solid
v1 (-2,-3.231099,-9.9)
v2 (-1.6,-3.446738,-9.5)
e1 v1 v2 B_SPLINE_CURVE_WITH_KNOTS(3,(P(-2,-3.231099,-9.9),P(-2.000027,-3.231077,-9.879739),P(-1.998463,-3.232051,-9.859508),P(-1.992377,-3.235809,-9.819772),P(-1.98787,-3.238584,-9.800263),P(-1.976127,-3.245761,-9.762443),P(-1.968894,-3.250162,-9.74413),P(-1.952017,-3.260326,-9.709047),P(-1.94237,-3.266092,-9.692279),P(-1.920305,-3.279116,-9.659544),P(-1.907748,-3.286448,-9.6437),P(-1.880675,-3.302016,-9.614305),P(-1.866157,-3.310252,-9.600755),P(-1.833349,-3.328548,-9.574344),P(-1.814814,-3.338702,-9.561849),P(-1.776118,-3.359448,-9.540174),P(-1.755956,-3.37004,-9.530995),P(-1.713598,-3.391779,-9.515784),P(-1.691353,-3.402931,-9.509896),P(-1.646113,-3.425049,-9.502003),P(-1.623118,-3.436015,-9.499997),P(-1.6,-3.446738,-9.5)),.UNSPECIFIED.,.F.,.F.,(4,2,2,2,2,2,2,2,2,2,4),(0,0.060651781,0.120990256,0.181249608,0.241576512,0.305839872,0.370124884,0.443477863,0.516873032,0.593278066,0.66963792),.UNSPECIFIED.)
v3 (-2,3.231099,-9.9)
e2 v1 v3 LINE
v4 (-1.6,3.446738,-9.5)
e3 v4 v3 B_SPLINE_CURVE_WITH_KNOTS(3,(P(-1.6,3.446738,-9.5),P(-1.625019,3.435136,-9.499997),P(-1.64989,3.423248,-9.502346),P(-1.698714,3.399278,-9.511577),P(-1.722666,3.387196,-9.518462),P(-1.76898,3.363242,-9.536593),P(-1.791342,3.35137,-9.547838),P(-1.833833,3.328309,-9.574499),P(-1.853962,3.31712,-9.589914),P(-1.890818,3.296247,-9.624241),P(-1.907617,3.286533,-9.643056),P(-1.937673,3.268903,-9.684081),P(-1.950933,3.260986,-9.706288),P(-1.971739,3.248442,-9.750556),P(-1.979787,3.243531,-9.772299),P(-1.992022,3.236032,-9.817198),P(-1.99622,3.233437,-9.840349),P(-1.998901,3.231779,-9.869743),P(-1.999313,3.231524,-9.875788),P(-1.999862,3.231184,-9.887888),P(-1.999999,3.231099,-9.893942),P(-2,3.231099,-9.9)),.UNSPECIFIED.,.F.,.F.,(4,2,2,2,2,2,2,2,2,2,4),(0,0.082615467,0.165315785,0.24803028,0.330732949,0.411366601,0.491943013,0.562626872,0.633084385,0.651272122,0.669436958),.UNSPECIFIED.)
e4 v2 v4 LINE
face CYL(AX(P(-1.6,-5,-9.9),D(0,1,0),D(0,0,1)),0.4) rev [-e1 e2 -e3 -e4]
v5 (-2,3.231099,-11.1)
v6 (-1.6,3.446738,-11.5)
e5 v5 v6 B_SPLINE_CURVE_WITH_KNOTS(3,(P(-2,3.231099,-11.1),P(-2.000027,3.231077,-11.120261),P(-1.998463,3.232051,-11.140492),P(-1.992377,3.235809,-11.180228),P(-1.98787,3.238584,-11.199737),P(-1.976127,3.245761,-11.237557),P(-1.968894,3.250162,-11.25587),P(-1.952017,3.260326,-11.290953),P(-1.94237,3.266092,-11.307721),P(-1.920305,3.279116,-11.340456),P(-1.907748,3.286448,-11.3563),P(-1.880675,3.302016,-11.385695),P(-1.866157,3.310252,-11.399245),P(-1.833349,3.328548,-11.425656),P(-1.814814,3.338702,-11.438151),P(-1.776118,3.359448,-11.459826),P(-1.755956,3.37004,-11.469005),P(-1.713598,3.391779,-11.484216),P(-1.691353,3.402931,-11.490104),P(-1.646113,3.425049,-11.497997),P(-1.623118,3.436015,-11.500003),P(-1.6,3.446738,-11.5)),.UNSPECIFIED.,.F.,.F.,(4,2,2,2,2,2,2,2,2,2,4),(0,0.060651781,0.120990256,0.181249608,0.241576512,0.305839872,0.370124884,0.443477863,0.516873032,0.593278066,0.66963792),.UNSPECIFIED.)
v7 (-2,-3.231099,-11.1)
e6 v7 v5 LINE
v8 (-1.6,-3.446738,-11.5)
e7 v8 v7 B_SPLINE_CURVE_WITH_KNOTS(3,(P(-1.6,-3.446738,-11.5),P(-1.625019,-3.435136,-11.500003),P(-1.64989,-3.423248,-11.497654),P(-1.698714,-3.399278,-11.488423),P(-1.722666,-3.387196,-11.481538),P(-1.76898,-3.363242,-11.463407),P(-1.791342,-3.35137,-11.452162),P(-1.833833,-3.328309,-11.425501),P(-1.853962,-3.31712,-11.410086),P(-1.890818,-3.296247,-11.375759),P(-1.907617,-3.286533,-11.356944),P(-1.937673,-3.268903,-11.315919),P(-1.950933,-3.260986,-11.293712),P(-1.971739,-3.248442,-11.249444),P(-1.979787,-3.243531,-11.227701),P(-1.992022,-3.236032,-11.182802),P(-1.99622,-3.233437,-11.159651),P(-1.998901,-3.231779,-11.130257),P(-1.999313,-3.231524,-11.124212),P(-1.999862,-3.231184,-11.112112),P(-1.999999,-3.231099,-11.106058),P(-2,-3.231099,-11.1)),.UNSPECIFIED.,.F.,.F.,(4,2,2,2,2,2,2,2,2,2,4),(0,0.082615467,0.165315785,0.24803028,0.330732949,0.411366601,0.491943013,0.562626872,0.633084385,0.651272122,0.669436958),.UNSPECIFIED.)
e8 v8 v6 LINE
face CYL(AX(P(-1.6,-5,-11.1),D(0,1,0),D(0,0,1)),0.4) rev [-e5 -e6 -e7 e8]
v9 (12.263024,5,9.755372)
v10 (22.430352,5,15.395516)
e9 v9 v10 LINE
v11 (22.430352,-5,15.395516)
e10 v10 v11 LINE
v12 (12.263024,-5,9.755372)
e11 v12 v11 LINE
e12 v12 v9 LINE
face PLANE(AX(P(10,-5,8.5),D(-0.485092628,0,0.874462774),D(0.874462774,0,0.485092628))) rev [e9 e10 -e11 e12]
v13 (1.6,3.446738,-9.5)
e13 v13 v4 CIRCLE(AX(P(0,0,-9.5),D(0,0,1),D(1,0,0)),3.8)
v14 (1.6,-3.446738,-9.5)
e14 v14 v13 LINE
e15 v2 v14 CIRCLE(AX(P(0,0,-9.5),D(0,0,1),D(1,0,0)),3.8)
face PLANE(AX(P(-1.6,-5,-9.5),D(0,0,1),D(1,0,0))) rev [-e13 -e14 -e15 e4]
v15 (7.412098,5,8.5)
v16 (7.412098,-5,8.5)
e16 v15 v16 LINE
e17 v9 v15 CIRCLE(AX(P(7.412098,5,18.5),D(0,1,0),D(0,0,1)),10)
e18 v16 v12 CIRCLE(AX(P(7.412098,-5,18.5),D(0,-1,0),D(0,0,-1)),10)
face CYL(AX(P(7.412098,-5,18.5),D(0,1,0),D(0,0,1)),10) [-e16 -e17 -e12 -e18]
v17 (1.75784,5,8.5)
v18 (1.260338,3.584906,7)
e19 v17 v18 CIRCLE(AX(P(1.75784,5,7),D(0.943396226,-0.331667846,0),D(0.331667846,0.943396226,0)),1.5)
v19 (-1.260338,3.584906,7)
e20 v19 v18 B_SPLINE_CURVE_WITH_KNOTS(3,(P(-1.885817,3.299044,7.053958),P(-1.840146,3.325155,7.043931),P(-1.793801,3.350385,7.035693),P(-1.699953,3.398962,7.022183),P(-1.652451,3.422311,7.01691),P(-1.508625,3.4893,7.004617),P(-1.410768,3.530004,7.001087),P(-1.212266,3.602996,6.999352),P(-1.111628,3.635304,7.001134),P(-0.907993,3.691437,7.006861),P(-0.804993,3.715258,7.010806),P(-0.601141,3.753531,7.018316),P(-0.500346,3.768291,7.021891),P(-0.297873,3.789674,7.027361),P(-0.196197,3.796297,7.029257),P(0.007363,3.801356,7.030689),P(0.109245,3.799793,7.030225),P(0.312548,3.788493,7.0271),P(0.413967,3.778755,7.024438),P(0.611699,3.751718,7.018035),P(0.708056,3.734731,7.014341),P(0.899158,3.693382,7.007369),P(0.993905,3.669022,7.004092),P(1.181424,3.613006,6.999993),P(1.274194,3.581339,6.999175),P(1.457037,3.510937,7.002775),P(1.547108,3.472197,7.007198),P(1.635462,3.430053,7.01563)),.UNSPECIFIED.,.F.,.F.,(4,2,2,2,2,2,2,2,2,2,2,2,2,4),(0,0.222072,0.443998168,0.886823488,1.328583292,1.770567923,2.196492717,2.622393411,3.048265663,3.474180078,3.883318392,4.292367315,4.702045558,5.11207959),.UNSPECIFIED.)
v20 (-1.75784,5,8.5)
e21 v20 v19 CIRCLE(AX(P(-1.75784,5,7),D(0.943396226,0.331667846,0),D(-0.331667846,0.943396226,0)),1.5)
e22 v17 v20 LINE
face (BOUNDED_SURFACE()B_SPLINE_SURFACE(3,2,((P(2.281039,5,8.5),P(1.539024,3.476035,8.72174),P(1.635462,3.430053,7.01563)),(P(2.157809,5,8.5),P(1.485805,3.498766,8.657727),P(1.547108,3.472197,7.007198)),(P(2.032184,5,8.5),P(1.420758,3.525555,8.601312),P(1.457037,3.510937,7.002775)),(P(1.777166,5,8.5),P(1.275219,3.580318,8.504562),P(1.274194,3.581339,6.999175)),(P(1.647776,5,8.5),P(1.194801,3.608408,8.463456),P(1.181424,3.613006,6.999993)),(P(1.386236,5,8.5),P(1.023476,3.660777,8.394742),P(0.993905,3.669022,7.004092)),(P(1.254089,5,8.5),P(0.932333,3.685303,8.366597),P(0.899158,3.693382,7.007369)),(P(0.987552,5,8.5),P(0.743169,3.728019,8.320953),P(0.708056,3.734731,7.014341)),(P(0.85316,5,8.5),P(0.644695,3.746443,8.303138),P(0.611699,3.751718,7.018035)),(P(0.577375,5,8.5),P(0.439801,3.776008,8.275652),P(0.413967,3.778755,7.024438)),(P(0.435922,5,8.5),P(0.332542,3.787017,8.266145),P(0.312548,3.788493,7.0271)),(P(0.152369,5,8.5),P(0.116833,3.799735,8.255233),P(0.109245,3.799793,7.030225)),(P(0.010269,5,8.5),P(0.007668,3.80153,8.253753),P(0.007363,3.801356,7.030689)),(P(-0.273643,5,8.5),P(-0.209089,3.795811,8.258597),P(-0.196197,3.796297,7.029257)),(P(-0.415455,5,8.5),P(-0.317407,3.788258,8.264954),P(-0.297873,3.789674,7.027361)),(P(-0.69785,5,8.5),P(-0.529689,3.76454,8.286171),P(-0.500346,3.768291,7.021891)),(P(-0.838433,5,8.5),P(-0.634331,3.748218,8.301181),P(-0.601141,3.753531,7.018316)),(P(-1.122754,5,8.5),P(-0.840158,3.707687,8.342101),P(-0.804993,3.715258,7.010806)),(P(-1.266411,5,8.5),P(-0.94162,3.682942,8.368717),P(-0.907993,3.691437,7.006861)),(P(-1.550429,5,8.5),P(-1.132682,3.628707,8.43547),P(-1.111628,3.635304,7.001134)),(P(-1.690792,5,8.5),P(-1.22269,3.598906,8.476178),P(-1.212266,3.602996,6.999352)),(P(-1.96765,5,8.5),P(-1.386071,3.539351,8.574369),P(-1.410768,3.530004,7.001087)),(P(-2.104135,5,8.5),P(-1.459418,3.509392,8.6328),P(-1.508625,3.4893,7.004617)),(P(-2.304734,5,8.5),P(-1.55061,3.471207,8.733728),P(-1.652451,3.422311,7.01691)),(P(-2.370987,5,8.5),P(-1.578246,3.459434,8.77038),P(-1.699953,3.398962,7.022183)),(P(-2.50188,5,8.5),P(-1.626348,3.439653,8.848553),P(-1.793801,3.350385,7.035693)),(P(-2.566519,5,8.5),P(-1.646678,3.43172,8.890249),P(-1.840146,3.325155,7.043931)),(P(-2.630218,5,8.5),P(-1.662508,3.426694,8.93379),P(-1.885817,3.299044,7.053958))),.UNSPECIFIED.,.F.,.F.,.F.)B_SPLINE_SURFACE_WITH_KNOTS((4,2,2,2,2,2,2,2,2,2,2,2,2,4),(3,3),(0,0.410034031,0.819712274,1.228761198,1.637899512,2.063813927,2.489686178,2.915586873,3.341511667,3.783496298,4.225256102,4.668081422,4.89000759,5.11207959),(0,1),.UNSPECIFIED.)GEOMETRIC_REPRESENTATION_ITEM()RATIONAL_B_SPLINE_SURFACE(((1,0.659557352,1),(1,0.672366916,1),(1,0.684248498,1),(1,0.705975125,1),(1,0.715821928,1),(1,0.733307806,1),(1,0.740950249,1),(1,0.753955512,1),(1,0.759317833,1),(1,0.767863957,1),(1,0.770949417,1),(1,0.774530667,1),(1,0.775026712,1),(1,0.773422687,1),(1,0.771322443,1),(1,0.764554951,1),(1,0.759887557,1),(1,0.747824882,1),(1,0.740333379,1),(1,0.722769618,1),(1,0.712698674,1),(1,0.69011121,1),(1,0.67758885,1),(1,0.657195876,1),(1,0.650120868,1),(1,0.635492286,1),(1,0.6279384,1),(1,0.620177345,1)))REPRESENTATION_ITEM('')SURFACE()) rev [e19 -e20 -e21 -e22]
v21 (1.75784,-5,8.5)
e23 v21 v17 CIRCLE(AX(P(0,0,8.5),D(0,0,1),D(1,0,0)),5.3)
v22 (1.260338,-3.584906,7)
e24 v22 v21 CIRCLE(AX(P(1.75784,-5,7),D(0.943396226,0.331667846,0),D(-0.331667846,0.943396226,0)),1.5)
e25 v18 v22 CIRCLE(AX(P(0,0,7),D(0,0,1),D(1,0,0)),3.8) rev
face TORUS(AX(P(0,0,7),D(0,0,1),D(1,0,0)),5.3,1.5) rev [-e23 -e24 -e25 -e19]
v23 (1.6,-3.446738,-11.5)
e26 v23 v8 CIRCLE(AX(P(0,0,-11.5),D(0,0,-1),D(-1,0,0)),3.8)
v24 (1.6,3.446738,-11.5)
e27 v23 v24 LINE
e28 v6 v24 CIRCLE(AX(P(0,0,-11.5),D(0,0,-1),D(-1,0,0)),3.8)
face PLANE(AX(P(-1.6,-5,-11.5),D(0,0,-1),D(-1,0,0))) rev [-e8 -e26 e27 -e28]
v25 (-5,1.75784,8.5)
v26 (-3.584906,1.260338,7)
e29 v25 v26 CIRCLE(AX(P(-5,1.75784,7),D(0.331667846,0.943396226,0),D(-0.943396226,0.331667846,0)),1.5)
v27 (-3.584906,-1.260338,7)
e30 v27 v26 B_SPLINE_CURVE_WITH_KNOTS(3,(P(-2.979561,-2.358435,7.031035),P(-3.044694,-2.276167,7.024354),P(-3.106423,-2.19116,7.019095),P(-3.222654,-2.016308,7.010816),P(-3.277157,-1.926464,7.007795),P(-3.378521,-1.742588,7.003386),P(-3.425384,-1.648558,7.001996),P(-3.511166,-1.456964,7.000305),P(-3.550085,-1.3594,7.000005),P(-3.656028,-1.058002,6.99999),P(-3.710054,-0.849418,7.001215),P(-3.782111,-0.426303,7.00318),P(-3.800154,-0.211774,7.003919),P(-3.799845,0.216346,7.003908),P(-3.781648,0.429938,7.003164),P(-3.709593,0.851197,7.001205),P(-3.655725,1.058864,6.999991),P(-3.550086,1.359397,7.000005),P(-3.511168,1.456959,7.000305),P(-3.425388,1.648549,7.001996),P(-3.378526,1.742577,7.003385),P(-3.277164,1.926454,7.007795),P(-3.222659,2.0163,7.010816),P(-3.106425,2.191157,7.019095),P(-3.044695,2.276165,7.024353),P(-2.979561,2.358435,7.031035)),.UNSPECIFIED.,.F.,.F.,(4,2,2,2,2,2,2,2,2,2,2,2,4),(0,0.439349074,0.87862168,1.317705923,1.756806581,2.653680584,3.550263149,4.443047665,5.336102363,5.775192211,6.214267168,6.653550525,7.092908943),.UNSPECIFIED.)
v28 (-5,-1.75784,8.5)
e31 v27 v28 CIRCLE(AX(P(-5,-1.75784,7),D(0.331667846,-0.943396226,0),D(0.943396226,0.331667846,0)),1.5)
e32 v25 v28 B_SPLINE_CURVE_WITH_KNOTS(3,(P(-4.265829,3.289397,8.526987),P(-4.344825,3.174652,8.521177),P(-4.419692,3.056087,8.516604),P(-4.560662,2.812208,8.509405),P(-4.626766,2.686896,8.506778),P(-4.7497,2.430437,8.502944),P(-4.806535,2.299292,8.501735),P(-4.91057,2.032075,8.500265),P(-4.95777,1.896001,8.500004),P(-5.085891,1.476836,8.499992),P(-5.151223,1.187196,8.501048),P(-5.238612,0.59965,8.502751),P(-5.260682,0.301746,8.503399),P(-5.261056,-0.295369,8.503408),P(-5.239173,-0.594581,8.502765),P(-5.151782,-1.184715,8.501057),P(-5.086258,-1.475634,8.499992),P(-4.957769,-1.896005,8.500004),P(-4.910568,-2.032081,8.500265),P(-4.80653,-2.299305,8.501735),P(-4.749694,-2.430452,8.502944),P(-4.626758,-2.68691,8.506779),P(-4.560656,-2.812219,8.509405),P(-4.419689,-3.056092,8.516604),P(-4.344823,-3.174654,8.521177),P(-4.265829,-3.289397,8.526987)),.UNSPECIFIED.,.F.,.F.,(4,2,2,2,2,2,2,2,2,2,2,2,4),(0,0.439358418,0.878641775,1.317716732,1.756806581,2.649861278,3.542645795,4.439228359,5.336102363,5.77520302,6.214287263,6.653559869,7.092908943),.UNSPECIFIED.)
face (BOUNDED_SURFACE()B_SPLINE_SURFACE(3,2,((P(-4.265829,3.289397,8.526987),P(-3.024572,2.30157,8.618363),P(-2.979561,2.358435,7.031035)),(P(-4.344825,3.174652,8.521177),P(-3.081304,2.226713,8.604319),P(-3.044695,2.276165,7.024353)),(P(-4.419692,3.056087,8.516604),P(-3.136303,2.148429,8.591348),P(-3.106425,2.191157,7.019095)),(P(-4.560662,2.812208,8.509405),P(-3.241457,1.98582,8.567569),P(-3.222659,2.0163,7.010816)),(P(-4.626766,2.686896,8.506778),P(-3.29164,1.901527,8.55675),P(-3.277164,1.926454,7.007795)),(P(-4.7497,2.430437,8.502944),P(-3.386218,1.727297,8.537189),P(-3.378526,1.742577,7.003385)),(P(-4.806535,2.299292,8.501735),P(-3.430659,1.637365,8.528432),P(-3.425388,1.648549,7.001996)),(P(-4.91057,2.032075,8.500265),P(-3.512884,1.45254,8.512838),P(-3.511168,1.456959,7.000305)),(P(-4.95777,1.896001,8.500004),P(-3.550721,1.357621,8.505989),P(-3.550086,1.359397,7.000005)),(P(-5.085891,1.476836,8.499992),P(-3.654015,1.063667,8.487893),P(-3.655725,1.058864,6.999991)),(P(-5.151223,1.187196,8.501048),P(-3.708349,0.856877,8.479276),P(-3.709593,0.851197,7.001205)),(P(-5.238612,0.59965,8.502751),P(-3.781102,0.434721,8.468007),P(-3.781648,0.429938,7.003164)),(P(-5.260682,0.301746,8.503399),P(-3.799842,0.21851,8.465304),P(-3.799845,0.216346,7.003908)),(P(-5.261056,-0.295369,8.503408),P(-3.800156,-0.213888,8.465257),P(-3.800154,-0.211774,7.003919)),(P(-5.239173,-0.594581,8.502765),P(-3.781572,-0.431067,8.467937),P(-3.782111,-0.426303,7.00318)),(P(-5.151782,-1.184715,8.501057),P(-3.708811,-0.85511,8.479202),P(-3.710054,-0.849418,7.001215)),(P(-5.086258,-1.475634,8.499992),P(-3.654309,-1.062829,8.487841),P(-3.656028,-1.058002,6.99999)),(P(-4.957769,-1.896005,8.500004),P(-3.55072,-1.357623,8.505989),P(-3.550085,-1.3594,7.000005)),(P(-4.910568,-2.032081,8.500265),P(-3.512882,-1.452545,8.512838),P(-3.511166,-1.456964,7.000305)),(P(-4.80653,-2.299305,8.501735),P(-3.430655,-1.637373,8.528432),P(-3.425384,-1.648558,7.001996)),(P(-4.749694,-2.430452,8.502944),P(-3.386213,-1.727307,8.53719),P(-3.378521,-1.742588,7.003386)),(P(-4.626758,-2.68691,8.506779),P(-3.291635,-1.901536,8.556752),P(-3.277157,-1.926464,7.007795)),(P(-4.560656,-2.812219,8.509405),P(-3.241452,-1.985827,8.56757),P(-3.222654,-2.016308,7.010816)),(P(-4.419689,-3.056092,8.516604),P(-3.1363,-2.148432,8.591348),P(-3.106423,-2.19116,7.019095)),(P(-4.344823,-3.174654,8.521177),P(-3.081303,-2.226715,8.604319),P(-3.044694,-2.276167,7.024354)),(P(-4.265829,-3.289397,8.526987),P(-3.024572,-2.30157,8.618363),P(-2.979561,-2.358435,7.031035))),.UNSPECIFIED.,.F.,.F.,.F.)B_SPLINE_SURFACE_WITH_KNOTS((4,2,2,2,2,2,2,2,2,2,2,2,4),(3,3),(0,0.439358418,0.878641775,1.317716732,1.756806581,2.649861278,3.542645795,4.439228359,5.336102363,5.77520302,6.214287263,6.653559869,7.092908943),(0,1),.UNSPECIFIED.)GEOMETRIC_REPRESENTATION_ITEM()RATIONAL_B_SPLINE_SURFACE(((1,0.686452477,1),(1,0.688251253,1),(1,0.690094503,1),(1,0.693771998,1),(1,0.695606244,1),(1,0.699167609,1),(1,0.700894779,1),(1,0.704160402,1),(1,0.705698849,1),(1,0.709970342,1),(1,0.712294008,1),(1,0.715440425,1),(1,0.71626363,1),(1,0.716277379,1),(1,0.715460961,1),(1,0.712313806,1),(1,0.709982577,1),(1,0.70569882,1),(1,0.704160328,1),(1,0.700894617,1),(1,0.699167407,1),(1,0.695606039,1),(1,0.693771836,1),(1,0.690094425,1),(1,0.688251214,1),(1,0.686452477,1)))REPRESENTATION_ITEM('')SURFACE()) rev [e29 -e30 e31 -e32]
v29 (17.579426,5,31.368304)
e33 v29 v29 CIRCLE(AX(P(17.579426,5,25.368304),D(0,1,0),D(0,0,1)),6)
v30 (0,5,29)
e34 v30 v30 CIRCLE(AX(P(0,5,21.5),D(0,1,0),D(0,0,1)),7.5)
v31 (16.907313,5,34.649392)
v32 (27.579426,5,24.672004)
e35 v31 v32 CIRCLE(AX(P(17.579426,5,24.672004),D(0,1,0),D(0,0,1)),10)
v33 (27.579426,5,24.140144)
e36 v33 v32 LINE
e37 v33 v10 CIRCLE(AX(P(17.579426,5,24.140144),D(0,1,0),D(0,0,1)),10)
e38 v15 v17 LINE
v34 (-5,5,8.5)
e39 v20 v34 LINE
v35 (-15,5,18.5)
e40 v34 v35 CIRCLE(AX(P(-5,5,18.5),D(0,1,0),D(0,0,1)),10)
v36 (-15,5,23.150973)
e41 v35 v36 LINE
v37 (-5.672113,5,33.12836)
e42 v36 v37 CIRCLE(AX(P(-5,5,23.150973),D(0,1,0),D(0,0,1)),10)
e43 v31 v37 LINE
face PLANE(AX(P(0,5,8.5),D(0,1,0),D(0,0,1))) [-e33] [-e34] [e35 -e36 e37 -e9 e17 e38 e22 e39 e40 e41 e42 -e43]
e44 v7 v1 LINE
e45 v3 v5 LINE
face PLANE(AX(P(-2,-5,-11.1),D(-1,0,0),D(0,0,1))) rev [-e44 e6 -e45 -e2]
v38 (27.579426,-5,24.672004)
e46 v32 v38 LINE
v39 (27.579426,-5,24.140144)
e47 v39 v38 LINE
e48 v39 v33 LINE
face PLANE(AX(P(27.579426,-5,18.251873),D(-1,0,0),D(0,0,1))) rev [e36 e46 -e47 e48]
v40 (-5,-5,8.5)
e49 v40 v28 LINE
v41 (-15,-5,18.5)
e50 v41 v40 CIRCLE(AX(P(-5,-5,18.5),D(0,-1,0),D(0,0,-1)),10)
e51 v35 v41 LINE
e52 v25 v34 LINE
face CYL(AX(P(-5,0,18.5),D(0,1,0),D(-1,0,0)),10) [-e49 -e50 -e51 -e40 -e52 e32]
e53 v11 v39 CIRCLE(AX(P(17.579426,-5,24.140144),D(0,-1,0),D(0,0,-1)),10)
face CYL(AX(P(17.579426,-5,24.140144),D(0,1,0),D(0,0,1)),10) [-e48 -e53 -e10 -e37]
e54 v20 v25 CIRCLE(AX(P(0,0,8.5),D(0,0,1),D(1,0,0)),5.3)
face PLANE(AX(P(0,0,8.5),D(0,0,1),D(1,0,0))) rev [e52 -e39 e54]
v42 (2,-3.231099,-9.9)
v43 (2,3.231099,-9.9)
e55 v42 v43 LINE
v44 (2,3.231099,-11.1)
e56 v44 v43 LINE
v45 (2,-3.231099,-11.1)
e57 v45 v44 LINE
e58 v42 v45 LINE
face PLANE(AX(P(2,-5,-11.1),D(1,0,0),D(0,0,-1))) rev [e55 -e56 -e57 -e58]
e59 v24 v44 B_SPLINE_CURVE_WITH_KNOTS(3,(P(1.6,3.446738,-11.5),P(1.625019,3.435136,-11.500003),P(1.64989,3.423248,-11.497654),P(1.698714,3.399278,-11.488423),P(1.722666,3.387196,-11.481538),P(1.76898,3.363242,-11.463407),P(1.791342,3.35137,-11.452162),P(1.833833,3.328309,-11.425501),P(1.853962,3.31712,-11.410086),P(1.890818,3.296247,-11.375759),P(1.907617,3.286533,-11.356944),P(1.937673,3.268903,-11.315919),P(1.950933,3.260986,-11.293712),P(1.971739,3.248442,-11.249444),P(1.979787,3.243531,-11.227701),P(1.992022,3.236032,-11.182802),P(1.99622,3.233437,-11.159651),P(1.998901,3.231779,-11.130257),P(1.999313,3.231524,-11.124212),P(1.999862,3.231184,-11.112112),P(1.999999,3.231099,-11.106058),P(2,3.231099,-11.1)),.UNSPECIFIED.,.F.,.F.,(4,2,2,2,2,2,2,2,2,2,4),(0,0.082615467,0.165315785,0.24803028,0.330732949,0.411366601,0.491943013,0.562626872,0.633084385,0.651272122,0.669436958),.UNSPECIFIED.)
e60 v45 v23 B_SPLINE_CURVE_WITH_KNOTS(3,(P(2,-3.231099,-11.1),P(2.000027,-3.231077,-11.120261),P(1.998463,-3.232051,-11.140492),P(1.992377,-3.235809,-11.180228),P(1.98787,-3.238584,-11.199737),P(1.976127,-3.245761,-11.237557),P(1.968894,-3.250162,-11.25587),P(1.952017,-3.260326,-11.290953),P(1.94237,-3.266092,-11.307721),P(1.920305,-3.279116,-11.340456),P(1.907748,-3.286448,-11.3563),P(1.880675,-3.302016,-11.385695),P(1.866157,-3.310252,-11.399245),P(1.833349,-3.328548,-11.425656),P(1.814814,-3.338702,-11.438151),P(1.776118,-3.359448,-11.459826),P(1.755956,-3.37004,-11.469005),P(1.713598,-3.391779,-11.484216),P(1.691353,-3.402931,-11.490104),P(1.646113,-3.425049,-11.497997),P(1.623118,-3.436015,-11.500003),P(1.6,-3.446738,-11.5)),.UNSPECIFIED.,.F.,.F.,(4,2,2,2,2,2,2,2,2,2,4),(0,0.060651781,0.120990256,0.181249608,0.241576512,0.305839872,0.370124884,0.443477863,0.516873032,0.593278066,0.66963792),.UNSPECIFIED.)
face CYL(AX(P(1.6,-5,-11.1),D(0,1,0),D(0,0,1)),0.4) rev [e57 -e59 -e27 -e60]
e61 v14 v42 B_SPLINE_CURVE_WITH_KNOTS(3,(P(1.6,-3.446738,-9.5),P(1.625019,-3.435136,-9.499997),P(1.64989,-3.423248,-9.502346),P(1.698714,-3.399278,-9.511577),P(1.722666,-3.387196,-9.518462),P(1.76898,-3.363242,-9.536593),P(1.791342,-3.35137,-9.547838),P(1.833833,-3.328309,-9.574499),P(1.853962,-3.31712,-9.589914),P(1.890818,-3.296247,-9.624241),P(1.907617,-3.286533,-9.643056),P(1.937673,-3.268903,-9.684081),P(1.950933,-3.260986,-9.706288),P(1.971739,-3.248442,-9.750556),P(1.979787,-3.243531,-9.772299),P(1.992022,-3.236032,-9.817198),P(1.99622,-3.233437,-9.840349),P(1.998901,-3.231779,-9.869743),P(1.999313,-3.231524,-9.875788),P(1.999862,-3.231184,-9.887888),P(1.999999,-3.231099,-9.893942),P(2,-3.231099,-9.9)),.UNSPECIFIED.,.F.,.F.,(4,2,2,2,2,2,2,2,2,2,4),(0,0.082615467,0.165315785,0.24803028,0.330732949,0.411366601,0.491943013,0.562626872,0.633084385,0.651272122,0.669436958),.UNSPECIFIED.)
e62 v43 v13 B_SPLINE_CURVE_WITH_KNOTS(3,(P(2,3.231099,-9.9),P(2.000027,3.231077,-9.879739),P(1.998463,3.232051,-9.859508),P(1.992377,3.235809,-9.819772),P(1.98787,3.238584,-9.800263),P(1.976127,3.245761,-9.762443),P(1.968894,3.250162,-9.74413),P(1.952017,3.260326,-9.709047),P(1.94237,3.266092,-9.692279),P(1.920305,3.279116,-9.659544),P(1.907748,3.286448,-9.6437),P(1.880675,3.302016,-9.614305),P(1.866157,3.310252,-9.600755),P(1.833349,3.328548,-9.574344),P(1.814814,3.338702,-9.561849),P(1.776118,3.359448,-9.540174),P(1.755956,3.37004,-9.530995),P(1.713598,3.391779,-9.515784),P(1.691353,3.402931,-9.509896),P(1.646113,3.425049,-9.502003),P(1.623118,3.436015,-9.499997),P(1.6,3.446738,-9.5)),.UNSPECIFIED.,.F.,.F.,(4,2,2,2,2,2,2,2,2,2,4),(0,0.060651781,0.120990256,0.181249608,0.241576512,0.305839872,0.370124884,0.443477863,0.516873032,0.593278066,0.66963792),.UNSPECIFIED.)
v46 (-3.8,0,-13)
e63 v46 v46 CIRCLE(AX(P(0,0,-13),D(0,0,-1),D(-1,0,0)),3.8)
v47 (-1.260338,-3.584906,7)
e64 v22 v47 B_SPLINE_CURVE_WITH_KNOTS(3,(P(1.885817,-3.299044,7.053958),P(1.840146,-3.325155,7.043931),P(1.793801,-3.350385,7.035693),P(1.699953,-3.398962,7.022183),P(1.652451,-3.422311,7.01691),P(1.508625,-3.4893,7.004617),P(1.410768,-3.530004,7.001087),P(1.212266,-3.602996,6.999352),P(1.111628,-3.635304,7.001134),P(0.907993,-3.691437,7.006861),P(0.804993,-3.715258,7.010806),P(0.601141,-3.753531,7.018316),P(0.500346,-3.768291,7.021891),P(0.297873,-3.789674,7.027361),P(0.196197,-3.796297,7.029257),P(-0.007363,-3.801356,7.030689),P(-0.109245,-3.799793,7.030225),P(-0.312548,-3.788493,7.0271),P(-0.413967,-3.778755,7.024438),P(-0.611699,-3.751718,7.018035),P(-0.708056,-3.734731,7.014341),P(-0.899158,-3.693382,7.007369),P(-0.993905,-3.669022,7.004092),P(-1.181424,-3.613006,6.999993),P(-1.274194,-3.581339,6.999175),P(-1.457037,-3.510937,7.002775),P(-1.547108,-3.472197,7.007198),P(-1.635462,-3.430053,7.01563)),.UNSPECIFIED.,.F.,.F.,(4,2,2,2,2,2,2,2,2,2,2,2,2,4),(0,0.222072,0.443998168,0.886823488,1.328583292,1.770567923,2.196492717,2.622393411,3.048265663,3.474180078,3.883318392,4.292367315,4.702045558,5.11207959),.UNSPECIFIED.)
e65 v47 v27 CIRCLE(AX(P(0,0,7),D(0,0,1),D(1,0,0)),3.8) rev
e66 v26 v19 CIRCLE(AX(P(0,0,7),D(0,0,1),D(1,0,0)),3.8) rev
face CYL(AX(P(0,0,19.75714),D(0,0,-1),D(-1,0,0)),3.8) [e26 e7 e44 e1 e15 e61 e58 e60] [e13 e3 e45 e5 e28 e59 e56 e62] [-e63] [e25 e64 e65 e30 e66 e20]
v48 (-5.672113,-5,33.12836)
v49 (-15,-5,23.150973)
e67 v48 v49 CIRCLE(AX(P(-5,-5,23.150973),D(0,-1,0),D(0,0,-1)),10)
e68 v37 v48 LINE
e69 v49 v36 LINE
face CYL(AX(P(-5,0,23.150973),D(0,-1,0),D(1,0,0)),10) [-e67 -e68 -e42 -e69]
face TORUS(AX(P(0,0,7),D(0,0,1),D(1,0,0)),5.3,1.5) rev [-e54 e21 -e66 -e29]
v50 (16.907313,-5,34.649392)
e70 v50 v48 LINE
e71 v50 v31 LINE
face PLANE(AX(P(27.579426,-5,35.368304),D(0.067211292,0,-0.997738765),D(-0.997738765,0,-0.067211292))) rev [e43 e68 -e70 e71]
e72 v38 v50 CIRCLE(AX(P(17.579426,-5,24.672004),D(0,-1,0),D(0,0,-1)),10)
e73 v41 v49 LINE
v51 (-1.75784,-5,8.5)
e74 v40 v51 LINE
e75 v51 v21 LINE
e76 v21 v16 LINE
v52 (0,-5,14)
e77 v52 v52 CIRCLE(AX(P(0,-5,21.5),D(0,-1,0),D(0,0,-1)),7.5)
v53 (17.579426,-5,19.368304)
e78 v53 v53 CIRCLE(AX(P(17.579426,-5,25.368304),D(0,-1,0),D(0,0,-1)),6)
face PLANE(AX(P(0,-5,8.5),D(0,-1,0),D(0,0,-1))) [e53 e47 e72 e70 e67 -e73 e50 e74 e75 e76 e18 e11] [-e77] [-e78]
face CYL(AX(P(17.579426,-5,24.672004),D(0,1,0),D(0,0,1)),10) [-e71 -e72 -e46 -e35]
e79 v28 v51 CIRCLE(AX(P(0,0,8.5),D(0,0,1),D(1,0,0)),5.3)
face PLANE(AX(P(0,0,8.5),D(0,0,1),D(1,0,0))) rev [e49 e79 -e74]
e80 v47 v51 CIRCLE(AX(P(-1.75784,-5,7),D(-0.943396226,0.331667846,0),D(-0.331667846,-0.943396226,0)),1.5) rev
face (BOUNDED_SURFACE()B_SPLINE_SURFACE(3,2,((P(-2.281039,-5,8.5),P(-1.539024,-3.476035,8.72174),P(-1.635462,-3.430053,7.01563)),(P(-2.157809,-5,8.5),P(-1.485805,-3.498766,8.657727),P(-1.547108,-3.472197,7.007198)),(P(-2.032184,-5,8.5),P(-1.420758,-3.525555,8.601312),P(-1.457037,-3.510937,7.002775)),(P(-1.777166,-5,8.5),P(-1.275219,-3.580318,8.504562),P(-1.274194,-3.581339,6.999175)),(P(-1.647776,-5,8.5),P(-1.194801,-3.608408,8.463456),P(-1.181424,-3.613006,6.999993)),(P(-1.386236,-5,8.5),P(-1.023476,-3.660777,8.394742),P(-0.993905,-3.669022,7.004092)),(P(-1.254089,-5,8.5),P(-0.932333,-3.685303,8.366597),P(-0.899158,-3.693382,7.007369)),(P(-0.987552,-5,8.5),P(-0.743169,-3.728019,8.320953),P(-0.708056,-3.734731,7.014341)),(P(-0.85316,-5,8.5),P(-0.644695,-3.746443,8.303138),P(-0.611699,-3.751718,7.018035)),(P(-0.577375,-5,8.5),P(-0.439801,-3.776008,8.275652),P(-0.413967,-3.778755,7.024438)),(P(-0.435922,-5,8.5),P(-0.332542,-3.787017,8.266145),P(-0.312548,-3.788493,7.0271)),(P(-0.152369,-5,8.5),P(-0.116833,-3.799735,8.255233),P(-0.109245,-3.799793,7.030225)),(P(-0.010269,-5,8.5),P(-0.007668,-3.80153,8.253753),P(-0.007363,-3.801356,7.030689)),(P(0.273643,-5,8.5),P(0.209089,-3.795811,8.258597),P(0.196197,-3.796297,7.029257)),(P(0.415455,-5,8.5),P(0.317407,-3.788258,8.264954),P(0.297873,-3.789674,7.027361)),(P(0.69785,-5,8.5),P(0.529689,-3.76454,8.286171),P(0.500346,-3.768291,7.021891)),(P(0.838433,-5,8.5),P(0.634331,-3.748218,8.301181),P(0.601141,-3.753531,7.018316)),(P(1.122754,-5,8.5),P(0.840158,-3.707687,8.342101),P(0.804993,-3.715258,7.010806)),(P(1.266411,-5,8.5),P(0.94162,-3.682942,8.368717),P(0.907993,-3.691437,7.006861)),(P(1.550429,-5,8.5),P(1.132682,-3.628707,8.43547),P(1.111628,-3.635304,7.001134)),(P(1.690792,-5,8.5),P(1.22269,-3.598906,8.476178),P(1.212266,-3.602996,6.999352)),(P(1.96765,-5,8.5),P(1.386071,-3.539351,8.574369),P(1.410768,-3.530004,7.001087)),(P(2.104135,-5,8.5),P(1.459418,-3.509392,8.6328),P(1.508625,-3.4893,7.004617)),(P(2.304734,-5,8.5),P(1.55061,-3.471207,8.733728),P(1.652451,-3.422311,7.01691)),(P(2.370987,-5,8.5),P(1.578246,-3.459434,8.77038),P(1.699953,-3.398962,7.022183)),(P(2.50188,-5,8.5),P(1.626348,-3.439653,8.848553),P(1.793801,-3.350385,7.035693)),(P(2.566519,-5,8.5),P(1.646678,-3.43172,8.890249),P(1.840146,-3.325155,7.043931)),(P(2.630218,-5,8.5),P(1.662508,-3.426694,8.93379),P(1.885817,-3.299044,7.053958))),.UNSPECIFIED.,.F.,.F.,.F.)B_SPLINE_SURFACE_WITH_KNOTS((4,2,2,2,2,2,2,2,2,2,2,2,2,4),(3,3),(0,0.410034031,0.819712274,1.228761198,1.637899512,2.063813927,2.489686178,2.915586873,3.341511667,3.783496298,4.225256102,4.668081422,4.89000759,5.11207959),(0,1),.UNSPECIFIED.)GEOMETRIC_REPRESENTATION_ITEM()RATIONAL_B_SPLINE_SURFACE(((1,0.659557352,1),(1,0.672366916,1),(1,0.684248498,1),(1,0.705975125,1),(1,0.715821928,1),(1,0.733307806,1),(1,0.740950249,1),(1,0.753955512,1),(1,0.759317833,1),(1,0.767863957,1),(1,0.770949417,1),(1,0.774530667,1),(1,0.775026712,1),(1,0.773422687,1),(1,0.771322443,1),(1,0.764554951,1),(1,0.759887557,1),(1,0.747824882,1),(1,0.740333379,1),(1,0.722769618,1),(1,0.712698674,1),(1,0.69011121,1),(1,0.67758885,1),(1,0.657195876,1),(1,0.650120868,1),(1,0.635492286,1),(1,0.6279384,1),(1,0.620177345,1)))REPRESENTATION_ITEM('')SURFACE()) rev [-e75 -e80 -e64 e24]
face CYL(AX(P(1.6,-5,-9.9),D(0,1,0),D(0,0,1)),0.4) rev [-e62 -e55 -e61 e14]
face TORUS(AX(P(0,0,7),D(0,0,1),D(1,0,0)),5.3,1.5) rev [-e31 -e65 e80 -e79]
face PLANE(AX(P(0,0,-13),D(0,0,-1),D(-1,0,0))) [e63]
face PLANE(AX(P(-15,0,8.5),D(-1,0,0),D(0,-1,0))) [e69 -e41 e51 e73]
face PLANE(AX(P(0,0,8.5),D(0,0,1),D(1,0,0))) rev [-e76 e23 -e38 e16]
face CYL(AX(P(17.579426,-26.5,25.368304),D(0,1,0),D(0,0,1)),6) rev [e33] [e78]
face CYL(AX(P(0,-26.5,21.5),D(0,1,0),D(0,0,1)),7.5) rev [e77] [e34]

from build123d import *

# Parameters (mm, degrees)
SKETCH1_R           = 5
BOSS_EXTRUDE1_DEPTH = 20
SKETCH2_R           = 5
SKETCH2_R_2         = 3.98
CUT_EXTRUDE2_DEPTH  = 8
SKETCH8_R           = 5
BOSS_EXTRUDE2_DEPTH = 20
BOSS_EXTRUDE3_START = -31.5
BOSS_EXTRUDE3_DEPTH = 31.5
BOSS_EXTRUDE4_START = -31.5
BOSS_EXTRUDE4_DEPTH = 31.5
SKETCH12_R          = 7.5
SKETCH12_R_2        = 6
CUT_EXTRUDE3_DEPTH  = 31.5
CUT_EXTRUDE4_DEPTH  = 55.083269132
FILLET1_R           = 10
BOSS_EXTRUDE5_START = 13
SKETCH17_R          = 3.98
BOSS_EXTRUDE5_DEPTH = 13
CUT_EXTRUDE5_DEPTH  = 46.417762115
SKETCH19_R          = 5
SKETCH19_R_2        = 3.98
CUT_EXTRUDE6_DEPTH  = 0.5
SKETCH20_R          = 3.98
SKETCH20_R_2        = 3.8
CUT_EXTRUDE7_DEPTH  = 21.5
FILLET2_R           = 1.5


with BuildPart() as part:
    # Sketch1 → Boss-Extrude1 (new body)
    with BuildSketch(Plane.XY):
        Circle(SKETCH1_R)
    extrude(amount=BOSS_EXTRUDE1_DEPTH)

    # Sketch2 → Cut-Extrude2 (cut)
    with BuildSketch(Plane(origin=(0, 0, 0), x_dir=(-1, 0, 0), z_dir=(0, 0, -1))):
        Circle(SKETCH2_R)
        Circle(SKETCH2_R_2, mode=Mode.SUBTRACT)
    extrude(amount=-CUT_EXTRUDE2_DEPTH, mode=Mode.SUBTRACT)

    # Sketch8 → Boss-Extrude2 (add)
    with BuildSketch(Plane.XY.offset(20)):
        with Locations(Location((0, 0, 0), (0, 0, 180))):
            Circle(SKETCH8_R)
    extrude(amount=BOSS_EXTRUDE2_DEPTH)

    # Sketch9 → Boss-Extrude3 (add)
    with BuildSketch(Plane.XY.offset(40).offset(BOSS_EXTRUDE3_START)):
        with BuildLine():
            Line((0, 5), (35, 5))
            Line((35, 5), (35, -5))
            Line((35, -5), (0, -5))
            ThreePointArc((0, -5), (5, 0), (0, 5))
        make_face()
    extrude(amount=BOSS_EXTRUDE3_DEPTH)

    # Sketch10 → Boss-Extrude4 (add)
    with BuildSketch(Plane.XY.offset(40).offset(BOSS_EXTRUDE4_START)):
        with BuildLine():
            ThreePointArc((0, -5), (-5, 0), (0, 5))
            Line((0, 5), (-15, 5))
            Line((-15, 5), (-15, -5))
            Line((-15, -5), (0, -5))
        make_face()
    extrude(amount=BOSS_EXTRUDE4_DEPTH)

    # Sketch12 → Cut-Extrude3 (cut)
    with BuildSketch(Plane(origin=(0, 5, 0), x_dir=(1, 0, 0), z_dir=(0, 1, 0))):
        with Locations(Location((0, -21.5, 0), (0, 0, 270))):
            Circle(SKETCH12_R)
        with Locations(Location((17.579426131, -25.368304137, 0), (0, 0, 270))):
            Circle(SKETCH12_R_2)
    extrude(amount=-CUT_EXTRUDE3_DEPTH, mode=Mode.SUBTRACT)

    # Sketch14 → Cut-Extrude4 (cut, through all)
    with BuildSketch(Plane(origin=(0, 5, 0), x_dir=(1, 0, 0), z_dir=(0, 1, 0))):
        Polygon((-15, -40), (35, -40), (35, -37.368304137), (35, -8.5), (10, -8.5), (27.579426131, -18.251873125), (27.579426131, -35.368304137), (-15, -32.5), align=None)
    extrude(amount=-CUT_EXTRUDE4_DEPTH, mode=Mode.SUBTRACT)

    # Fillet1
    fillet1_edges = [part.edges().sort_by_distance(p)[0] for p in [
        (-15, 0, 8.5),
        (27.579426131, 0, 18.251873125),
        (10, 0, 8.5),
        (-15, 0, 32.5),
        (27.579426131, 0, 35.368304137),
    ]]
    fillet(fillet1_edges, radius=FILLET1_R - 0.0001)  # a hair under: the kernel refuses the full size

    # Sketch17 → Boss-Extrude5 (add)
    with BuildSketch(Plane(origin=(0, 0, 0), x_dir=(-1, 0, 0), z_dir=(0, 0, -1)).offset(BOSS_EXTRUDE5_START)):
        Circle(SKETCH17_R)
    extrude(amount=-BOSS_EXTRUDE5_DEPTH)

    # Sketch18 → Cut-Extrude5 (cut, through all)
    with BuildSketch(Plane(origin=(0, 5, 0), x_dir=(1, 0, 0), z_dir=(0, 1, 0))):
        with BuildLine():
            Line((-1.6, 11.5), (1.6, 11.5))
            ThreePointArc((1.6, 11.5), (1.882842712, 11.382842712), (2, 11.1))
            Line((2, 11.1), (2, 9.9))
            ThreePointArc((2, 9.9), (1.882842712, 9.617157288), (1.6, 9.5))
            Line((1.6, 9.5), (-1.6, 9.5))
            ThreePointArc((-1.6, 9.5), (-1.882842712, 9.617157288), (-2, 9.9))
            Line((-2, 9.9), (-2, 11.1))
            ThreePointArc((-2, 11.1), (-1.882842712, 11.382842712), (-1.6, 11.5))
        make_face()
    extrude(amount=-CUT_EXTRUDE5_DEPTH, mode=Mode.SUBTRACT)

    # Sketch19 → Cut-Extrude6 (cut)
    with BuildSketch(Plane(origin=(0, 0, 8), x_dir=(-1, 0, 0), z_dir=(0, 0, -1))):
        Circle(SKETCH19_R)
        Circle(SKETCH19_R_2, mode=Mode.SUBTRACT)
    extrude(amount=-CUT_EXTRUDE6_DEPTH, mode=Mode.SUBTRACT)

    # Sketch20 → Cut-Extrude7 (cut)
    with BuildSketch(Plane(origin=(0, 0, -13), x_dir=(-1, 0, 0), z_dir=(0, 0, -1))):
        Circle(SKETCH20_R)
        Circle(SKETCH20_R_2, mode=Mode.SUBTRACT)
    extrude(amount=-CUT_EXTRUDE7_DEPTH, mode=Mode.SUBTRACT)

    # Fillet2
    fillet2_edges = [part.edges().sort_by_distance(p)[0] for p in [
        (3.8, 0, 8.5),
    ]]
    fillet(fillet2_edges, radius=FILLET2_R)


solid = part.part
